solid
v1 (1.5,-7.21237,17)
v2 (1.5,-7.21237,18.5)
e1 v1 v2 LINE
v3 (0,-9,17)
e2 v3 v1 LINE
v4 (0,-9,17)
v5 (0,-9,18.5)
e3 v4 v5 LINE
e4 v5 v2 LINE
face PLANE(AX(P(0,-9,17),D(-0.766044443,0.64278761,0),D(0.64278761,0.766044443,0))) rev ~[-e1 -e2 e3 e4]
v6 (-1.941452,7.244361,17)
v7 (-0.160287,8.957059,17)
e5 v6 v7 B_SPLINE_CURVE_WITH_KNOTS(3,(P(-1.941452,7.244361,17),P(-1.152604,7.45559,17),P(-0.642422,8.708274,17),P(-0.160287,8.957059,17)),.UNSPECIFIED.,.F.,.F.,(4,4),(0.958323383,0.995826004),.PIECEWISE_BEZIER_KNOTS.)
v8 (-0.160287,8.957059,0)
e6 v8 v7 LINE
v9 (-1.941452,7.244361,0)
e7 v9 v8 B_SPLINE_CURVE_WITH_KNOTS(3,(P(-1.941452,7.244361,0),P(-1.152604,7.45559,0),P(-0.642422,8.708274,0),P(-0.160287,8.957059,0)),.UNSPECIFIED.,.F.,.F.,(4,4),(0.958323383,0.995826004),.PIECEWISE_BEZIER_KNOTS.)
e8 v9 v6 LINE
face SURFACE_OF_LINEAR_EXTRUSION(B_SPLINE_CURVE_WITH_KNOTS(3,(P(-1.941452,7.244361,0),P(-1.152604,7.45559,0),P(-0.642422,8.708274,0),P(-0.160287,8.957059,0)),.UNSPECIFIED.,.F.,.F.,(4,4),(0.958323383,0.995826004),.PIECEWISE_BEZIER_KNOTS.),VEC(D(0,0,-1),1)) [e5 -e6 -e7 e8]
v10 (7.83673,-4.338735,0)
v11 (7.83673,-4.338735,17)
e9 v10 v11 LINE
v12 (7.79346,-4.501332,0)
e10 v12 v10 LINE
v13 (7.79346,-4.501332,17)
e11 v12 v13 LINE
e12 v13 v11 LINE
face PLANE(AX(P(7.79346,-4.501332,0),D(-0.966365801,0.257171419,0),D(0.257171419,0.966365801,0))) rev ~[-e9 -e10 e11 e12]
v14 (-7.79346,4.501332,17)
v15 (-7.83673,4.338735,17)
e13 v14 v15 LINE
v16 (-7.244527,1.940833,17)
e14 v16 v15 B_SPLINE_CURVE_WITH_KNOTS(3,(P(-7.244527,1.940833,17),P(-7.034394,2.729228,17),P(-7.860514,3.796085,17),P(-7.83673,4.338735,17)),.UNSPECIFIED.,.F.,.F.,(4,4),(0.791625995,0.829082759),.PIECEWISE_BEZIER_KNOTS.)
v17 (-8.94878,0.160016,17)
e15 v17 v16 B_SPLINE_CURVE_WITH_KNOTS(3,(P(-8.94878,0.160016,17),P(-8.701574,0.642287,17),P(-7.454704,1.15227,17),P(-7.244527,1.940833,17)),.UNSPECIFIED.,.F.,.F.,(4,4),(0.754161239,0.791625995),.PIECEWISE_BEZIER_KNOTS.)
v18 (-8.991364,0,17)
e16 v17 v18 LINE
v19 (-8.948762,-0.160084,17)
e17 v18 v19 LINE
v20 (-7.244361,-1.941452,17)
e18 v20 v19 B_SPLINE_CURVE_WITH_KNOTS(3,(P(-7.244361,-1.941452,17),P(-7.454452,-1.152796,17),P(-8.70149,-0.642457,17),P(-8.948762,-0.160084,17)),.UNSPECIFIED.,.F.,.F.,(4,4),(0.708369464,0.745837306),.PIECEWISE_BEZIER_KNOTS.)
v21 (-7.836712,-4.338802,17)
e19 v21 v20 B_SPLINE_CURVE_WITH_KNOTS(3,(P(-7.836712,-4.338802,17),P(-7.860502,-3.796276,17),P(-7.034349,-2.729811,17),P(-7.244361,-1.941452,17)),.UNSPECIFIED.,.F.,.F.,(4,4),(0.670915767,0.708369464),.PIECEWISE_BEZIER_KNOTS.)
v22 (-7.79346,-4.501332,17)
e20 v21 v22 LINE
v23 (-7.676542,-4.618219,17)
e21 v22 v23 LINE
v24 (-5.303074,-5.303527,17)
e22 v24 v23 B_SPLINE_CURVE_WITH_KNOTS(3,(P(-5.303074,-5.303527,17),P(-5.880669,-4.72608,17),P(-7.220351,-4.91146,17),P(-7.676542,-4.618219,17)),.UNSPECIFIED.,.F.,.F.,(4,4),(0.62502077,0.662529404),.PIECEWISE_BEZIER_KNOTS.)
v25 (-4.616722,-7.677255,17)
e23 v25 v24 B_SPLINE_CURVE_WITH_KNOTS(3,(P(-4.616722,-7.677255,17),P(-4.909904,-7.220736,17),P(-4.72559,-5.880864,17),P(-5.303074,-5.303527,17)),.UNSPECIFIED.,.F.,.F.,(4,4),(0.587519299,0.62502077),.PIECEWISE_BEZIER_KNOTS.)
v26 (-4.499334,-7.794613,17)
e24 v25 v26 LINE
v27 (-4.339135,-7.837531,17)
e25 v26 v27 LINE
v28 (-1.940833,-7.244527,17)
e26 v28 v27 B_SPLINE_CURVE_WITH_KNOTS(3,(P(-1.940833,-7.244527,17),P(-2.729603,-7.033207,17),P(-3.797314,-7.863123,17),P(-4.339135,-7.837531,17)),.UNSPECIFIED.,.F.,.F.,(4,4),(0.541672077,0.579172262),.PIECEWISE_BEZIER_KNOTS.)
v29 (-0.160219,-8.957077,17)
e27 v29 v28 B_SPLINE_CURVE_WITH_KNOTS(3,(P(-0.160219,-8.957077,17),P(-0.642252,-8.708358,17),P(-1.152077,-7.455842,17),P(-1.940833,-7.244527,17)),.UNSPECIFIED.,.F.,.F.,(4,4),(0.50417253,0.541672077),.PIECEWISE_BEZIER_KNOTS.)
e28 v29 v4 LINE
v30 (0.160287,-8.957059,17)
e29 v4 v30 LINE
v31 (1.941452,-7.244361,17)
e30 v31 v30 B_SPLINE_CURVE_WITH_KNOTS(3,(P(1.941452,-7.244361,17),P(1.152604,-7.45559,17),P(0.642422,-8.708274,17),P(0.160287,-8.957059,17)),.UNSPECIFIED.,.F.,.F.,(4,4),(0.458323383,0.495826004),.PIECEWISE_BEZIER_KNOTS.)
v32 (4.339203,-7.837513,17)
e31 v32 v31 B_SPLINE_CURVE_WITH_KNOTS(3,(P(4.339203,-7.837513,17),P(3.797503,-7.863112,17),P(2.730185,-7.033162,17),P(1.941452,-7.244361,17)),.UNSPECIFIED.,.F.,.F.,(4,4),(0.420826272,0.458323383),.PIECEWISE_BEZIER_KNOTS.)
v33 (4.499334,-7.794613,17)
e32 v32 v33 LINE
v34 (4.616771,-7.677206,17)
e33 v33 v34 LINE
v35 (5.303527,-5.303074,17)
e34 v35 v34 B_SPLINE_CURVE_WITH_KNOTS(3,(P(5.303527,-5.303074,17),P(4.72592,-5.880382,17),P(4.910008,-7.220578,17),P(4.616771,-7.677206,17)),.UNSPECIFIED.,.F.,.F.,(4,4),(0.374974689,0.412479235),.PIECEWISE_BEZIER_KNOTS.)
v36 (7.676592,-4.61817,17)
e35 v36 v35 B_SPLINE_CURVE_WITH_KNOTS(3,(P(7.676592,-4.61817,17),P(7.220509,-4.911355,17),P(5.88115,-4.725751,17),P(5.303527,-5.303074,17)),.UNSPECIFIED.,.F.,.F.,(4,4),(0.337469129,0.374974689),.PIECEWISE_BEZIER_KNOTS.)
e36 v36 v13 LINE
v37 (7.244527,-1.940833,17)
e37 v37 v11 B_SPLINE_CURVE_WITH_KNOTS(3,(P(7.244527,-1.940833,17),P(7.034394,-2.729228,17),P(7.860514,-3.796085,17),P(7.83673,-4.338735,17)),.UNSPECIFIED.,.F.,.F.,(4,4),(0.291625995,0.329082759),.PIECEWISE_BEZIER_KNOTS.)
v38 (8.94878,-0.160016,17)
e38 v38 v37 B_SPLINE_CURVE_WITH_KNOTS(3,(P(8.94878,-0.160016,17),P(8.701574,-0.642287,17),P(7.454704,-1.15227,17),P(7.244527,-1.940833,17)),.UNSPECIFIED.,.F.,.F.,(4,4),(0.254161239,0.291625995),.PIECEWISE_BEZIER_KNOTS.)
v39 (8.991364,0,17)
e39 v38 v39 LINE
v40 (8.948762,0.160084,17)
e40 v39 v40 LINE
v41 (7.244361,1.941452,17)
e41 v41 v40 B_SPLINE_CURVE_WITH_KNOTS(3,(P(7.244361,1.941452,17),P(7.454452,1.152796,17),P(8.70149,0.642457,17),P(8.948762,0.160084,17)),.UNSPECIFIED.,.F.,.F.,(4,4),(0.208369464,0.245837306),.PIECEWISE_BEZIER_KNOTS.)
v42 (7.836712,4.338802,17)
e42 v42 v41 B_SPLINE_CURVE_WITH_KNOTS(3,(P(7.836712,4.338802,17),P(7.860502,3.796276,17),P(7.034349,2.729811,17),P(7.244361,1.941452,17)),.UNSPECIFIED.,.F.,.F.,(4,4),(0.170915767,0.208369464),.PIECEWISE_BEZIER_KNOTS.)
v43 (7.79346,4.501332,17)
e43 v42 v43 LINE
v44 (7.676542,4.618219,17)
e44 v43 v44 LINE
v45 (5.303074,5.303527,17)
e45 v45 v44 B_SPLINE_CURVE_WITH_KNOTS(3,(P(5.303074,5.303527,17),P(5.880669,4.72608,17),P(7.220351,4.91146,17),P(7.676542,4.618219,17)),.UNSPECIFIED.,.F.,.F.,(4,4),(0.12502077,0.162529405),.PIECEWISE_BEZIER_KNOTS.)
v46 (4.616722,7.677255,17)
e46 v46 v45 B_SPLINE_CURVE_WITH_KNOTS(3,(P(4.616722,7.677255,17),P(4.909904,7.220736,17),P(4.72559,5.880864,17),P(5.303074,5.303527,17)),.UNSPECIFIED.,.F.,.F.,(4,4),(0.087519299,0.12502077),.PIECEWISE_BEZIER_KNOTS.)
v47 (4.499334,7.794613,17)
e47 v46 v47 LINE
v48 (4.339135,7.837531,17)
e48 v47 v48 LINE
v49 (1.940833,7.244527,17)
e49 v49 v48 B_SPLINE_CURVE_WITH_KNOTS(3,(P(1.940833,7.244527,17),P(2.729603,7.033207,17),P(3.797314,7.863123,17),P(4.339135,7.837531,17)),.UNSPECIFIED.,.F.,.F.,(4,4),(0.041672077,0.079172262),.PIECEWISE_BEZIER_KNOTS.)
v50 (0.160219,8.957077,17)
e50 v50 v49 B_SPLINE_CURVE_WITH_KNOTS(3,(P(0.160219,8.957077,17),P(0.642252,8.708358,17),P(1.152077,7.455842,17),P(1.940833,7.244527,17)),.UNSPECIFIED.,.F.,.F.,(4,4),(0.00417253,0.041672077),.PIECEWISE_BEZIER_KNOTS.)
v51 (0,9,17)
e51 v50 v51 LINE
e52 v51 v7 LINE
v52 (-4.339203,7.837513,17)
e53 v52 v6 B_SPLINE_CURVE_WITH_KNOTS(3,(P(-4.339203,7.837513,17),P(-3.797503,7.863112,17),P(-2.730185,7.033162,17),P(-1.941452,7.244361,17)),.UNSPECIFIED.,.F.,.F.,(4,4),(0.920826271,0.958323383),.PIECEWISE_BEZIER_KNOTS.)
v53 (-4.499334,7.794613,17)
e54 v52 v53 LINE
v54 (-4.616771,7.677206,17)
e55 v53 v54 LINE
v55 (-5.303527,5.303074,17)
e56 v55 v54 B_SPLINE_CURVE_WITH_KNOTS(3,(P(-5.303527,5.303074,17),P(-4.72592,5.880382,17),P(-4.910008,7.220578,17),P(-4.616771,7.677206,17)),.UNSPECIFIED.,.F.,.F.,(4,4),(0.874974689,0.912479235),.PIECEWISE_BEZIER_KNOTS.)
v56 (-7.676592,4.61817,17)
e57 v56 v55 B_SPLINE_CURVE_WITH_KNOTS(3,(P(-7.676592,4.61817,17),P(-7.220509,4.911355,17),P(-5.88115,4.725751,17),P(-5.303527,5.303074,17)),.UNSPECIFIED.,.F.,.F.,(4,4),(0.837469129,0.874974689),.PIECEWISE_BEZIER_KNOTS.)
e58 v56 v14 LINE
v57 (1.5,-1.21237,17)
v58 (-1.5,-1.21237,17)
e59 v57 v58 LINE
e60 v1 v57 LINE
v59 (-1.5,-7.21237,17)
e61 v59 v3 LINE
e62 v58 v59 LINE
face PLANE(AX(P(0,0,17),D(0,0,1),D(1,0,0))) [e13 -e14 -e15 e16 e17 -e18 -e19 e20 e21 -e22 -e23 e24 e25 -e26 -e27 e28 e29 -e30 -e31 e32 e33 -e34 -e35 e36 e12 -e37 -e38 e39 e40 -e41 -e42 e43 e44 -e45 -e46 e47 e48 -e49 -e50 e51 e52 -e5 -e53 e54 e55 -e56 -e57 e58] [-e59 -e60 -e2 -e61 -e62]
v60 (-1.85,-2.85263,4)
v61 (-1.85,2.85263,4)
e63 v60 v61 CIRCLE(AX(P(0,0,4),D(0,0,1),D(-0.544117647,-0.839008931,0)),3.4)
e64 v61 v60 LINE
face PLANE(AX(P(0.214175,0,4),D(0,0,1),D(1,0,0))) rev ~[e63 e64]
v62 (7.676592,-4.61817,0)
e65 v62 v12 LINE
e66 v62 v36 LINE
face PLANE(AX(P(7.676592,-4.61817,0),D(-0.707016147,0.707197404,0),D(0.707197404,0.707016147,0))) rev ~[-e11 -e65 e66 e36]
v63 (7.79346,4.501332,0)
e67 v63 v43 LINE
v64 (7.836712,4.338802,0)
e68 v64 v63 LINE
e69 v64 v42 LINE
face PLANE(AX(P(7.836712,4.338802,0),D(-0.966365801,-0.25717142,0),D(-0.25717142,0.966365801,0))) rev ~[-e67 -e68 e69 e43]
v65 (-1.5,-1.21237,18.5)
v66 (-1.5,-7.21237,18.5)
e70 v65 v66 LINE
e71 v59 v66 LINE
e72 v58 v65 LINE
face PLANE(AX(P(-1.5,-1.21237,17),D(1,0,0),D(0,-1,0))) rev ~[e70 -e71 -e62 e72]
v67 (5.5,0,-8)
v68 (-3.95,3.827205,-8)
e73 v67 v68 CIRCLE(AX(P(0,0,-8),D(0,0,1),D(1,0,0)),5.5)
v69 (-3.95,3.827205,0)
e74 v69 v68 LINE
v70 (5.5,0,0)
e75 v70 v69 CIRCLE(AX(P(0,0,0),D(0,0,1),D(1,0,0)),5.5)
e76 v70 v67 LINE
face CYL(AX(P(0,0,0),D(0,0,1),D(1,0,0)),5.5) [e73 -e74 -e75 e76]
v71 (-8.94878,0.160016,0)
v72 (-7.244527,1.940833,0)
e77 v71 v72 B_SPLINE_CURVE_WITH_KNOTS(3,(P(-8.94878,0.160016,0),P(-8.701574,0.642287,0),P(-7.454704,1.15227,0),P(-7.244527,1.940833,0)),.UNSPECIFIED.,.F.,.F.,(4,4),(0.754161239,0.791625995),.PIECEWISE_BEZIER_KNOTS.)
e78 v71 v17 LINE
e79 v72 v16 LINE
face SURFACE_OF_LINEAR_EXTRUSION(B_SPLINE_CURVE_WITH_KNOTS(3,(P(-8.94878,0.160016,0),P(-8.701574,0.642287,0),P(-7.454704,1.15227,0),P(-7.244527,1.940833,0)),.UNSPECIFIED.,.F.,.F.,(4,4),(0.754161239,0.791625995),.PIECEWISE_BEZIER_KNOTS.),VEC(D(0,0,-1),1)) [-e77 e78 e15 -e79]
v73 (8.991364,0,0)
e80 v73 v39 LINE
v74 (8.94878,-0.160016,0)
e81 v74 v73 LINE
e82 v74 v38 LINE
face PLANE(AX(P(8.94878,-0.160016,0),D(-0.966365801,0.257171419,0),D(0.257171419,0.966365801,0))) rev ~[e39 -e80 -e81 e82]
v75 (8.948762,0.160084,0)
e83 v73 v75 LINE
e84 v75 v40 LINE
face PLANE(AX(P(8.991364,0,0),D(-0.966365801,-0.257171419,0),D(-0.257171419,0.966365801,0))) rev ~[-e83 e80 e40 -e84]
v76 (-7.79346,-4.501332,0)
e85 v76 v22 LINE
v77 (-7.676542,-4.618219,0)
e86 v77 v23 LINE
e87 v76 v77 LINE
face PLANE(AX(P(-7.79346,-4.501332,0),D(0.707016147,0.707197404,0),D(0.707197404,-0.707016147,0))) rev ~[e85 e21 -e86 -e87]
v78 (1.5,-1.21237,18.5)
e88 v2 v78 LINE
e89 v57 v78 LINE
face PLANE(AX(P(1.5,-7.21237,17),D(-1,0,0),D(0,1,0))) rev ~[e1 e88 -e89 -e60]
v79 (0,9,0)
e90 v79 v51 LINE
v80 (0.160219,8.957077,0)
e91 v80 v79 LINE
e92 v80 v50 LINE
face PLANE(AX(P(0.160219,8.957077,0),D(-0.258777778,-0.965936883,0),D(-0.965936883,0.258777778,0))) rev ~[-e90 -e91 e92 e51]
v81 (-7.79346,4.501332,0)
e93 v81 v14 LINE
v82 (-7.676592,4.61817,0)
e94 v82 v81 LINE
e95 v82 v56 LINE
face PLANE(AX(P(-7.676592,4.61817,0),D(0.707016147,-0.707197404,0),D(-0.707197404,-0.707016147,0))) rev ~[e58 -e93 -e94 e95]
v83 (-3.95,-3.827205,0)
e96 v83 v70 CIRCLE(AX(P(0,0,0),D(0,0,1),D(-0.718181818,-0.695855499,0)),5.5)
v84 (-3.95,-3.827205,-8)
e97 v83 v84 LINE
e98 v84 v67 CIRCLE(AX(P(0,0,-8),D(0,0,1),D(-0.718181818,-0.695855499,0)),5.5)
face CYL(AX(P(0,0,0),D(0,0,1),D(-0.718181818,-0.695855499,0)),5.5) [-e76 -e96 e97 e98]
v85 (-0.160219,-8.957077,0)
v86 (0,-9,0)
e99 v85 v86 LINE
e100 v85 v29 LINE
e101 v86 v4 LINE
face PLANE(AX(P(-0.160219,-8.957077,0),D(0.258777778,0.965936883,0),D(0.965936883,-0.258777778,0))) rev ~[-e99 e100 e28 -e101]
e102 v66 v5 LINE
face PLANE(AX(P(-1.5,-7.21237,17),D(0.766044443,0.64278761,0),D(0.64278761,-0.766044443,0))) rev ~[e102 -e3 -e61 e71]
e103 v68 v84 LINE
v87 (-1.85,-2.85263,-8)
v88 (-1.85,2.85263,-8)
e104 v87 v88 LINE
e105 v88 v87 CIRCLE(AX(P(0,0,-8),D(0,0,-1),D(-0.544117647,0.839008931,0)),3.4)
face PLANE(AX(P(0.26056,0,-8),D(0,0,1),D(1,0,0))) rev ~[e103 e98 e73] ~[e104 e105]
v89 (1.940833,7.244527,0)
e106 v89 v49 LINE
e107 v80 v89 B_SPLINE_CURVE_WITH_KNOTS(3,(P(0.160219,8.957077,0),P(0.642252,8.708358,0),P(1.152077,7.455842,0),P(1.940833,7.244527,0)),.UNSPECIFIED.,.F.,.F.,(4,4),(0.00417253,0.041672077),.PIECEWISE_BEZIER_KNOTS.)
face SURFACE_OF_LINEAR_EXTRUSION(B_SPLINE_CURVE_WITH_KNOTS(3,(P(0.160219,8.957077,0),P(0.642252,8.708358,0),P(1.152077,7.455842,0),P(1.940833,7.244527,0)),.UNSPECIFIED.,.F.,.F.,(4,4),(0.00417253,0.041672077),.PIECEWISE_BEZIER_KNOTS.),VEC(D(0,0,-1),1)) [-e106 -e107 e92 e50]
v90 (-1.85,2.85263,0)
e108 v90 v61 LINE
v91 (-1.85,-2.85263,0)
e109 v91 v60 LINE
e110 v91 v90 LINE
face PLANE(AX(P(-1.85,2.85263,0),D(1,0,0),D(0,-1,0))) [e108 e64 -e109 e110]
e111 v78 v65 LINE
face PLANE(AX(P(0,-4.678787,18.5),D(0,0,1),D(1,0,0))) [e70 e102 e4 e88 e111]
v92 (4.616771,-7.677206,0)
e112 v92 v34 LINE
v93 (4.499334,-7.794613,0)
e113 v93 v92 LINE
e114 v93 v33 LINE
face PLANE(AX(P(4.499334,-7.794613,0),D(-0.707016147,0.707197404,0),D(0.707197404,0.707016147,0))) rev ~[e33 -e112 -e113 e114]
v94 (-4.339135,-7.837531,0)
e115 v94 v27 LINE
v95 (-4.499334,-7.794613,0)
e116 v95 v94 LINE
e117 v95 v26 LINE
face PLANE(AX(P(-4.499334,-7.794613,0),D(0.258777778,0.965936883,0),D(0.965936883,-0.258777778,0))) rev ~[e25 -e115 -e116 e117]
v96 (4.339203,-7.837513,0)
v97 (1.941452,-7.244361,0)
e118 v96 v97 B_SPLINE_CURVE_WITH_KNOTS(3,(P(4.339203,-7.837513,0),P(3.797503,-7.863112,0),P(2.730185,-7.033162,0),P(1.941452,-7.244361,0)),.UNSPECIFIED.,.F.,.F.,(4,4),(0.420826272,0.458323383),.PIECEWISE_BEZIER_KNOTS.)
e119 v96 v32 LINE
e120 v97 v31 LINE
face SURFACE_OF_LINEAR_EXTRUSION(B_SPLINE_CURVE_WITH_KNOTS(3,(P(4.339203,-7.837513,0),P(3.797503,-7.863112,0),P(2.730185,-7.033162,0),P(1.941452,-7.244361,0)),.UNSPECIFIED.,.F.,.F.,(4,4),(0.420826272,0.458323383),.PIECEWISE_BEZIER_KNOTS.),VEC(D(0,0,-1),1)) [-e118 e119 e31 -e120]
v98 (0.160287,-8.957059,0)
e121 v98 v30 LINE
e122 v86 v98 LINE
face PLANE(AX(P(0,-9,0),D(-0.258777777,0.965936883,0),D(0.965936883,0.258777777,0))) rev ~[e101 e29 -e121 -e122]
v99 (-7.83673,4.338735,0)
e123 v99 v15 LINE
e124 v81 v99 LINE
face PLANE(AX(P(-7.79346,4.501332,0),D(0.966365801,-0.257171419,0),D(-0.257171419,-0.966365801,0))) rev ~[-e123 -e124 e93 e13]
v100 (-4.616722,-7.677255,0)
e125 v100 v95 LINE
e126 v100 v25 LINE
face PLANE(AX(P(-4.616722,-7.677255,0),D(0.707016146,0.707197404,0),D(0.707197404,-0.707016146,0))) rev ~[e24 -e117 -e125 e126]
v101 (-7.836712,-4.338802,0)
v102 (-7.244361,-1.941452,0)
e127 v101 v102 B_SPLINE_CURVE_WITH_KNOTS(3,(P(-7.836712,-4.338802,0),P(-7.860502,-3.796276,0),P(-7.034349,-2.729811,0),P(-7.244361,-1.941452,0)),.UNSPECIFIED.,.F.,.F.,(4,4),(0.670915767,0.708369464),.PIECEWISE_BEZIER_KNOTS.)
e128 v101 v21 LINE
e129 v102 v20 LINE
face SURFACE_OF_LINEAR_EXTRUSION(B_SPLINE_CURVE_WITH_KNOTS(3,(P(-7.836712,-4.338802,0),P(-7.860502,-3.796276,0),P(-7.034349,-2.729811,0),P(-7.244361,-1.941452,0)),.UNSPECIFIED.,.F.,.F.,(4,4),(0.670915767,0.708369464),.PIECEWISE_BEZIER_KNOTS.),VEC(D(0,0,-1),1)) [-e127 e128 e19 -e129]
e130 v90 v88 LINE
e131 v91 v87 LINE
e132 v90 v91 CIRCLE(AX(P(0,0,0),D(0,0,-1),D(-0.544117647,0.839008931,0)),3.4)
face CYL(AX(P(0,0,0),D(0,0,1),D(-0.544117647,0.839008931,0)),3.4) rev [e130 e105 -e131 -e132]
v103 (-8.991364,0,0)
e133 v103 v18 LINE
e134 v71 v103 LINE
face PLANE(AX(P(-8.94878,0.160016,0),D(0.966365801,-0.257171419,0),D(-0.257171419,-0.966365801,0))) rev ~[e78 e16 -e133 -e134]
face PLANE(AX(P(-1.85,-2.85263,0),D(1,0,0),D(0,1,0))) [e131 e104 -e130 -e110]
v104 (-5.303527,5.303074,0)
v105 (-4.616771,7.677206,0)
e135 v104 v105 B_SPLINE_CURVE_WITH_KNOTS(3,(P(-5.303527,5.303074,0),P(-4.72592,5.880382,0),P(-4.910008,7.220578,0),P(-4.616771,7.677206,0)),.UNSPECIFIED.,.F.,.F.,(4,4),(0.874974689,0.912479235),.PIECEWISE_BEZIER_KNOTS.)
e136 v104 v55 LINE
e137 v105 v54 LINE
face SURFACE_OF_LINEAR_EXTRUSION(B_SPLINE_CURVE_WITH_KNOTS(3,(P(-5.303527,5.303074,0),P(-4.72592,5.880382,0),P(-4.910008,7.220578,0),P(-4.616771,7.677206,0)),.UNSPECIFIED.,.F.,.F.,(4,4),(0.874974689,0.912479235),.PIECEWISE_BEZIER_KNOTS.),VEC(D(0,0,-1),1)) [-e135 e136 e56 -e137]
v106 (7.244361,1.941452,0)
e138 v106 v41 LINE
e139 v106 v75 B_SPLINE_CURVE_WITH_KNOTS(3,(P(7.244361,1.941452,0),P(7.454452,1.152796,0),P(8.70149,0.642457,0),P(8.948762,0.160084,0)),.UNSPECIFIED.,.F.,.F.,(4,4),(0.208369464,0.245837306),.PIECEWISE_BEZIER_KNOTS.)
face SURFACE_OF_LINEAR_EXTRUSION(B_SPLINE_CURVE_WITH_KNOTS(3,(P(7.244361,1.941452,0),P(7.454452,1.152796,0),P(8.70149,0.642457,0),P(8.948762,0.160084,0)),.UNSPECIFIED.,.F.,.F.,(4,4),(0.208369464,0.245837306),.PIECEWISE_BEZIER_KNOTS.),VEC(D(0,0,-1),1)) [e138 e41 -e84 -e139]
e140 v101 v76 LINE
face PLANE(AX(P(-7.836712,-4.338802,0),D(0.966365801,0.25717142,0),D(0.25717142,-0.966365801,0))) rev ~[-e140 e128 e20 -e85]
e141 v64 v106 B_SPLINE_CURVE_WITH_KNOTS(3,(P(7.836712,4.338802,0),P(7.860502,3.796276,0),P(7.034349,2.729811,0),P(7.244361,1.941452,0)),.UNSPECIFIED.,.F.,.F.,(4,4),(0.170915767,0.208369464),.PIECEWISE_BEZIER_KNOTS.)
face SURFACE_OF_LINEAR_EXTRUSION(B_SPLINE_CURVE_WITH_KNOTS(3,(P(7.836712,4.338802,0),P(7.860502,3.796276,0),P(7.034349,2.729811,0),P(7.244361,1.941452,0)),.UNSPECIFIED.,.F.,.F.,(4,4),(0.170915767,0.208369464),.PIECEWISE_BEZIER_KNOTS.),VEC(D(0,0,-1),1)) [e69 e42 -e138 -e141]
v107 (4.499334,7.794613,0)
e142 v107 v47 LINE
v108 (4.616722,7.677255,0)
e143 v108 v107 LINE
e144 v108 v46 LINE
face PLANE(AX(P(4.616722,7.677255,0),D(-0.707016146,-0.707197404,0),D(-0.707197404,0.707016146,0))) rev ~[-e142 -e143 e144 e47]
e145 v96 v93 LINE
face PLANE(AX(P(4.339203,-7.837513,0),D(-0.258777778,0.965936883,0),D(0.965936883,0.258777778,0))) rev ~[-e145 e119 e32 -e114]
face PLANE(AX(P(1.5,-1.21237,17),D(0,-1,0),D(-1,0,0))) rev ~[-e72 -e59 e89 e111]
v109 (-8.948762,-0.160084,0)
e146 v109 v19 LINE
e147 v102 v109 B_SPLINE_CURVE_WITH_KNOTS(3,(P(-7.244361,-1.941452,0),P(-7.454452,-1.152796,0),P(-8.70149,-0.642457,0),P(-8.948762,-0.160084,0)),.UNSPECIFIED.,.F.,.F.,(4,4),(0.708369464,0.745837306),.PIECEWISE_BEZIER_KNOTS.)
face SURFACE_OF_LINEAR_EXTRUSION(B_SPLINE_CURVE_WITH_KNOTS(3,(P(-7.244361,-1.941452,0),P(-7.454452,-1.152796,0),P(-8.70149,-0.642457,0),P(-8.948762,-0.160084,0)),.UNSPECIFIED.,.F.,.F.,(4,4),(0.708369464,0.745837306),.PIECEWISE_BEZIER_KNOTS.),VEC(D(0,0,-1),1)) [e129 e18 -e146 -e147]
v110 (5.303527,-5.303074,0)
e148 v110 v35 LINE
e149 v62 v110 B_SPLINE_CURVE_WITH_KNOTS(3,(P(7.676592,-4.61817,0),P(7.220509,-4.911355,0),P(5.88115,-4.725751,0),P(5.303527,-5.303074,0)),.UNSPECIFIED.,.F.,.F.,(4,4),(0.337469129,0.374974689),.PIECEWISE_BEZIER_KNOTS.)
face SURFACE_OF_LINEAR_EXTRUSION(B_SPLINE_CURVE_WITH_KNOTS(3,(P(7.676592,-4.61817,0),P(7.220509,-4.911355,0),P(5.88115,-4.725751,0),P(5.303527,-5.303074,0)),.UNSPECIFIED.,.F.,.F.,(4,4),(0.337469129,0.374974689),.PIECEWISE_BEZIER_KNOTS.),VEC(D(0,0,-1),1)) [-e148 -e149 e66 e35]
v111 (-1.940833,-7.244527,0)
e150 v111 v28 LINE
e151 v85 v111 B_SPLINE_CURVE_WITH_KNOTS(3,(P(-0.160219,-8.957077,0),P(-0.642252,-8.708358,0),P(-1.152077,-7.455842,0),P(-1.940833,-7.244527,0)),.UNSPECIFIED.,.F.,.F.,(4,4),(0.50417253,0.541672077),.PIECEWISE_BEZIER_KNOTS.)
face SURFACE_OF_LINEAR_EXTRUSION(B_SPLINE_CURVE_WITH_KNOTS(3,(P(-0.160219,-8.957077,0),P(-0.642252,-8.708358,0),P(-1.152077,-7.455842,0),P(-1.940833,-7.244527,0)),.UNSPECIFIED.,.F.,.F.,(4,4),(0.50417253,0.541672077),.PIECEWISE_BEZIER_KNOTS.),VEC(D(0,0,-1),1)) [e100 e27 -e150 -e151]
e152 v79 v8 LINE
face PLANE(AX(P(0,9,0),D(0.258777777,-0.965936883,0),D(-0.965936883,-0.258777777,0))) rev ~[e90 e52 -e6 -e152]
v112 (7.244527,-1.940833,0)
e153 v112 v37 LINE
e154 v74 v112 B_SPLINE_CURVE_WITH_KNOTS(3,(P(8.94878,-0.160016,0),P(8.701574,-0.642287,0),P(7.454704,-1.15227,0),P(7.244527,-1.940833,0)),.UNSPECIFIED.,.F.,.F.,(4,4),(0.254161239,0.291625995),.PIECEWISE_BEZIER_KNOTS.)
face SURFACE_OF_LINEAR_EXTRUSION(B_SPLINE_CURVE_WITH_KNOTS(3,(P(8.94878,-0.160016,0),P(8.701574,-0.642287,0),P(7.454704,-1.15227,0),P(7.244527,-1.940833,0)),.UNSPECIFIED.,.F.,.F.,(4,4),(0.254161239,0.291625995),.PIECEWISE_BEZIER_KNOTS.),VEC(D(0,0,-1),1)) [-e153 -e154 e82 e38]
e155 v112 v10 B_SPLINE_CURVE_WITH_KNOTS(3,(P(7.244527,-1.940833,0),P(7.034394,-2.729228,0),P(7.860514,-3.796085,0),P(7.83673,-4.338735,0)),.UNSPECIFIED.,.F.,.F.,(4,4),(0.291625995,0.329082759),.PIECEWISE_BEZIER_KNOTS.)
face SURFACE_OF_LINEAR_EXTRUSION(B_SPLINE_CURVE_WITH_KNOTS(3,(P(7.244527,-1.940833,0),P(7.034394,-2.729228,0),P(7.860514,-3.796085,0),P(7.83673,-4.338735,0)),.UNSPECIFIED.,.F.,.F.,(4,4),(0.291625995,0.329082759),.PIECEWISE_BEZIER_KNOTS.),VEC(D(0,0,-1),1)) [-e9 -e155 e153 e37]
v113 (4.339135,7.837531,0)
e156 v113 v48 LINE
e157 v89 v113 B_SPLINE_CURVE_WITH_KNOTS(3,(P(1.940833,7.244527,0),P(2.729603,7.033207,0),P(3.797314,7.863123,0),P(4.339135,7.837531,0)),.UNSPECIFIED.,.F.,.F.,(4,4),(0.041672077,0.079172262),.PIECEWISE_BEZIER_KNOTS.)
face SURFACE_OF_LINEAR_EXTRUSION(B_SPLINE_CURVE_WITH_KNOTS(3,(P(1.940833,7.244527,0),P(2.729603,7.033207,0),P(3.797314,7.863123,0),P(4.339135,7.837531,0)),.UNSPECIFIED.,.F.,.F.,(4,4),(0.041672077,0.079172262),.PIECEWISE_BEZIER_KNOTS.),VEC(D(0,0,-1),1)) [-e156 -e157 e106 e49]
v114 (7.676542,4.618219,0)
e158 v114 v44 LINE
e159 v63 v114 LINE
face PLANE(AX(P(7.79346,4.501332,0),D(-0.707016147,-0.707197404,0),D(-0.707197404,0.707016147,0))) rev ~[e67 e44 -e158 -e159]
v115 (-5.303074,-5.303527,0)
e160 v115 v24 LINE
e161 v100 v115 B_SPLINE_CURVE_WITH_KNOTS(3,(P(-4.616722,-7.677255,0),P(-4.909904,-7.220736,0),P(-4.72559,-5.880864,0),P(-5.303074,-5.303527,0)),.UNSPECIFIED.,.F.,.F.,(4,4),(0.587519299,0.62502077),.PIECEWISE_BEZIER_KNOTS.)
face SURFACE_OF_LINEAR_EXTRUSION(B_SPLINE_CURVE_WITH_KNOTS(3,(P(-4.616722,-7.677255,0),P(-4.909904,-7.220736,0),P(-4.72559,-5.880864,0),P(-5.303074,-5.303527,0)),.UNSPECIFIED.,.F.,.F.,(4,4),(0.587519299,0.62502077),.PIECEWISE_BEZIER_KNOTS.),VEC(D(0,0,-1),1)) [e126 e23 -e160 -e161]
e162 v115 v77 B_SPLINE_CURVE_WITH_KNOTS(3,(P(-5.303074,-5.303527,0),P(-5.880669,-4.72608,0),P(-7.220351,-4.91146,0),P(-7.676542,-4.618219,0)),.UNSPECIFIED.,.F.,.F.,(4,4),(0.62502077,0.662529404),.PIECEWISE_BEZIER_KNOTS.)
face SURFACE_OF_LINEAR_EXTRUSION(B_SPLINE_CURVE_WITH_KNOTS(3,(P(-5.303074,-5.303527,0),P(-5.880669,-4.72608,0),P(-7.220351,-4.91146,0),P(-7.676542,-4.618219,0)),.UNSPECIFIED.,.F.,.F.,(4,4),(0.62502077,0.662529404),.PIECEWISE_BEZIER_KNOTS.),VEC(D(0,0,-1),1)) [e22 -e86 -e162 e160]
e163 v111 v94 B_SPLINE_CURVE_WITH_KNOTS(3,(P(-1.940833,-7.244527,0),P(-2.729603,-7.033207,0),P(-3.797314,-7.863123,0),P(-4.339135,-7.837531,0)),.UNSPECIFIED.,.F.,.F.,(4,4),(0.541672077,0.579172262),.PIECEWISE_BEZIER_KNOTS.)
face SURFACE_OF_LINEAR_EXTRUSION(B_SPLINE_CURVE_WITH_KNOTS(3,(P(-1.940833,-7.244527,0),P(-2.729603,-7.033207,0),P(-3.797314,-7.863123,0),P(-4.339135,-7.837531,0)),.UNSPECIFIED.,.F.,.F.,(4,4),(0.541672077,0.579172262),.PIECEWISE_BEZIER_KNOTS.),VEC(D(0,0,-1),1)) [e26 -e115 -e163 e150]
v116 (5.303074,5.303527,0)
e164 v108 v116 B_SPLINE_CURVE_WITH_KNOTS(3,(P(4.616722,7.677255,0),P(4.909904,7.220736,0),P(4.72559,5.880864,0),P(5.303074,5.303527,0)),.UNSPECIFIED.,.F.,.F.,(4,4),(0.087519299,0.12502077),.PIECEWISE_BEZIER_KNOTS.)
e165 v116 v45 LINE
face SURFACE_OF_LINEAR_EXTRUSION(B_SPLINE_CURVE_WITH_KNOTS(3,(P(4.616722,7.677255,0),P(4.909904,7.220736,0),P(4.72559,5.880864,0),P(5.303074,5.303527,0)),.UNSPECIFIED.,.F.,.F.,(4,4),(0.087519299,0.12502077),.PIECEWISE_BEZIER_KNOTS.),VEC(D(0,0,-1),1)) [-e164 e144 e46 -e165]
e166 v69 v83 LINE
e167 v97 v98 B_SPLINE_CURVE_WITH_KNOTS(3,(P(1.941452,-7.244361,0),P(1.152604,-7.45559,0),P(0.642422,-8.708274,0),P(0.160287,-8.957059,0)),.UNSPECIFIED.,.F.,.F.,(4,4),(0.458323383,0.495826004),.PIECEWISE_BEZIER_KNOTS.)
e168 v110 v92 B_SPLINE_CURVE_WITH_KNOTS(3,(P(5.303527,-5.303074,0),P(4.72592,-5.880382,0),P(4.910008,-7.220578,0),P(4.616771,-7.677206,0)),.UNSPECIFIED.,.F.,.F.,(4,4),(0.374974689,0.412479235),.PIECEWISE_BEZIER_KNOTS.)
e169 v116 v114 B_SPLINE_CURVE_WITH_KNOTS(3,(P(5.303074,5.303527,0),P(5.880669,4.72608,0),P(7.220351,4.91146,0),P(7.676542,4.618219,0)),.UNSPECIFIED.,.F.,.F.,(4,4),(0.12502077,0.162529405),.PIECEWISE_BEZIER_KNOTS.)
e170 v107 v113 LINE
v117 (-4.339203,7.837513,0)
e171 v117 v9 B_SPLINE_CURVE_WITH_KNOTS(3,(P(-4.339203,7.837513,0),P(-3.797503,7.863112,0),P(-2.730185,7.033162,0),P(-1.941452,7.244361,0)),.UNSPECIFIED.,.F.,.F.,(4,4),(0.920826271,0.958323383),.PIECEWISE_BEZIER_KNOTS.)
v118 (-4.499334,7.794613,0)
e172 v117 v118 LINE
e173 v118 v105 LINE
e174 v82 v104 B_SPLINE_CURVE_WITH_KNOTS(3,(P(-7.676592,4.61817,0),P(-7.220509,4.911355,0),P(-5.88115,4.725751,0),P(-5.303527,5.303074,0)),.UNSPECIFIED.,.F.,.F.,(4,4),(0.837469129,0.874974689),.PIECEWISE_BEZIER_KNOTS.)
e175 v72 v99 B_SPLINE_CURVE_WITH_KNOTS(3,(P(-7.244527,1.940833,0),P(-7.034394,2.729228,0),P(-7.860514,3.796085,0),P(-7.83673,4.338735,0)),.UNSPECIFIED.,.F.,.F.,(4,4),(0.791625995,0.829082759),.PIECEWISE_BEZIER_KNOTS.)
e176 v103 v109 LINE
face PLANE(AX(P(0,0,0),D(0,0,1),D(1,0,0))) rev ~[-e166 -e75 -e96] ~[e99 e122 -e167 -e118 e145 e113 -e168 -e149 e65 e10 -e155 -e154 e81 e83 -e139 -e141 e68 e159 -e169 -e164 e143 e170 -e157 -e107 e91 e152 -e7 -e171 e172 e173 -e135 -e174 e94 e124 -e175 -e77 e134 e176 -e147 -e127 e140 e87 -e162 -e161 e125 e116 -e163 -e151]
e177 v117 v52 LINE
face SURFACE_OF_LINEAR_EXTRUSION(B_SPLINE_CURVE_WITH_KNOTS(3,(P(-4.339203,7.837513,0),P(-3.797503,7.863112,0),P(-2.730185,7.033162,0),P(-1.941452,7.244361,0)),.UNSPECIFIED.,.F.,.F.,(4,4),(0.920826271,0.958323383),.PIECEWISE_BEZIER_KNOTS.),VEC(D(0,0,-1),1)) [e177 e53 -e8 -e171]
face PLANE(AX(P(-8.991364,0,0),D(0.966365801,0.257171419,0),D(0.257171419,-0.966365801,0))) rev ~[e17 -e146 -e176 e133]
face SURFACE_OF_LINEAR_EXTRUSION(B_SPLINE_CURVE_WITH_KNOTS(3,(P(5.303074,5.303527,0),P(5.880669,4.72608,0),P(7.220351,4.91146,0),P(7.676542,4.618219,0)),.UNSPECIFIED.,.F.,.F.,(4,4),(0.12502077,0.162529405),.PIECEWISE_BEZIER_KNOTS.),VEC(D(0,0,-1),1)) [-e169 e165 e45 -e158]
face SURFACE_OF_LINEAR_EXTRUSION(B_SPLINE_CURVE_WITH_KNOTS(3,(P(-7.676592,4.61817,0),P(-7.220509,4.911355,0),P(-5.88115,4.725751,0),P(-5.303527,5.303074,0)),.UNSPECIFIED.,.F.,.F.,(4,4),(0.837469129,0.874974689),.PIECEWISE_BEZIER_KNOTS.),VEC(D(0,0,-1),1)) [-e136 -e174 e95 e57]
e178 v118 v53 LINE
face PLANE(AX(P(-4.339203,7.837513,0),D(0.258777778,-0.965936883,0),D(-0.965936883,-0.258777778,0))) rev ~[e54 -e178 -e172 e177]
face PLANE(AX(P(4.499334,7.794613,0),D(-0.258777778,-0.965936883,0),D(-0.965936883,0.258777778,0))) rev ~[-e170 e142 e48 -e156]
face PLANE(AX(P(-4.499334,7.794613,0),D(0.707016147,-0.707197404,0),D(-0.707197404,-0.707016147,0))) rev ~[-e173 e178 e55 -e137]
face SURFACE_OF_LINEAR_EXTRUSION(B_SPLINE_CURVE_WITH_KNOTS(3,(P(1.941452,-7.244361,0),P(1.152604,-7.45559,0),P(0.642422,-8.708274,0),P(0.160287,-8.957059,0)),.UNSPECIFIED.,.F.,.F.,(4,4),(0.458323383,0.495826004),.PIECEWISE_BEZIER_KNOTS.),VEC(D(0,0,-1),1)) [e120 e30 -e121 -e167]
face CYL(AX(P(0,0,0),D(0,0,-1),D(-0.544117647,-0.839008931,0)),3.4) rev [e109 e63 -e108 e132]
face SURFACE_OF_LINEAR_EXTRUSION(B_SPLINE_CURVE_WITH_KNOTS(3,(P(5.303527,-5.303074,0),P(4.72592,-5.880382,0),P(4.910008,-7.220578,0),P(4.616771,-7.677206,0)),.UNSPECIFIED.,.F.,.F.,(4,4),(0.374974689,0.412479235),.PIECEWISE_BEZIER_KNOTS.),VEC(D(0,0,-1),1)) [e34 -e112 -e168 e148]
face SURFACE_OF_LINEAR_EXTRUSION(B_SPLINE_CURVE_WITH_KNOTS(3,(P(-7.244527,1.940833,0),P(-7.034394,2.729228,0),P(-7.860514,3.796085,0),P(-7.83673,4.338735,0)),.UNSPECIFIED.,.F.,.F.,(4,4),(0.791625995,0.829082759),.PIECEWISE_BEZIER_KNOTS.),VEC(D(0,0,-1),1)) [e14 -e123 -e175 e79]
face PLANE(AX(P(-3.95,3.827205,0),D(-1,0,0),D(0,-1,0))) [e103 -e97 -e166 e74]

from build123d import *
from build123d import SkipClean  # not in build123d's __all__

# Parameters (mm, degrees)
F1_DEPTH = 17
F2_DEPTH = 8
F3_DEPTH = 4
F5_DEPTH = 1.5


# Not quite as in the source:
# - after a boolean that leaves OpenCascade's solid faulty, fix() repairs it
# - a feature names something its author has since deleted; it is built from what else it names


with BuildPart() as f1:
    # F0 (on Top) → F1 (new body)
    with BuildSketch(Plane.XY):
        Polygon((-7.2445266217, 1.9408333333), (-7.2443607594, -1.9414523397), (-5.303074282, -5.3035274261), (-1.9408333333, -7.2445266217), (1.9414523397, -7.2443607594), (5.3035274261, -5.303074282), (7.2445266217, -1.9408333333), (7.2443607594, 1.9414523397), (5.303074282, 5.3035274261), (1.9408333333, 7.2445266217), (-1.9414523397, 7.2443607594), (-5.3035274261, 5.303074282), align=None)
        with BuildLine():
            ThreePointArc((-3.95, 3.8272052467), (2.0645822822, 5.0977936404), (5.5, 0))
            ThreePointArc((5.5, 0), (2.0645822822, -5.0977936404), (-3.95, -3.8272052467))
            ThreePointArc((-3.95, -3.8272052467), (-5.5, 0), (-3.95, 3.8272052467))
        make_face(mode=Mode.SUBTRACT)
        with BuildLine():
            ThreePointArc((-3.95, -3.8272052467), (2.0645822822, -5.0977936404), (5.5, 0))
            ThreePointArc((5.5, 0), (2.0645822822, 5.0977936404), (-3.95, 3.8272052467))
            Line((-3.95, 3.8272052467), (-3.95, -3.8272052467))
        make_face()
        with BuildLine():
            Line((-1.85, -2.8526303651), (-1.85, 2.8526303651))
            ThreePointArc((-1.85, 2.8526303651), (3.4, 0), (-1.85, -2.8526303651))
        make_face(mode=Mode.SUBTRACT)
        with BuildLine():
            ThreePointArc((-1.85, -2.8526303651), (3.4, 0), (-1.85, 2.8526303651))
            Line((-1.85, 2.8526303651), (-1.85, -2.8526303651))
        make_face()
        with BuildLine():
            Line((-3.95, -3.8272052467), (-3.95, 3.8272052467))
            ThreePointArc((-3.95, 3.8272052467), (-5.5, 0), (-3.95, -3.8272052467))
        make_face()
        with BuildLine():
            add(Edge.make_bspline(
                [(5.303074282, 5.3035274261), (5.8806686185, 4.7260804431), (7.2203514603, 4.9114598493), (7.6765424159, 4.6182190274)],
                knots=[0.1250207704, 0.1250207704, 0.1250207704, 0.1250207704, 0.1625294045, 0.1625294045, 0.1625294045, 0.1625294045], degree=3))
            Line((5.303074282, 5.3035274261), (7.2443607594, 1.9414523397))
            add(Edge.make_bspline(
                [(7.836712211, 4.338802441), (7.8605022236, 3.7962755696), (7.0343491304, 2.7298107055), (7.2443607594, 1.9414523397)],
                knots=[0.1709157668, 0.1709157668, 0.1709157668, 0.1709157668, 0.2083694642, 0.2083694642, 0.2083694642, 0.2083694642], degree=3))
            Line((7.836712211, 4.338802441), (7.7934595092, 4.5013319004))
            Line((7.7934595092, 4.5013319004), (7.6765424159, 4.6182190274))
        make_face()
        with BuildLine():
            Line((7.2445266217, -1.9408333333), (5.3035274261, -5.303074282))
            add(Edge.make_bspline(
                [(7.6765915068, -4.6181699492), (7.2205093081, -4.9113554899), (5.8811502119, -4.725750538), (5.3035274261, -5.303074282)],
                knots=[0.3374691289, 0.3374691289, 0.3374691289, 0.3374691289, 0.3749746888, 0.3749746888, 0.3749746888, 0.3749746888], degree=3))
            Line((7.6765915068, -4.6181699492), (7.7934595092, -4.5013319004))
            Line((7.7934595092, -4.5013319004), (7.8367302299, -4.3387347317))
            add(Edge.make_bspline(
                [(7.2445266217, -1.9408333333), (7.0343944918, -2.729228444), (7.8605138313, -3.7960853183), (7.8367302299, -4.3387347317)],
                knots=[0.2916259951, 0.2916259951, 0.2916259951, 0.2916259951, 0.3290827591, 0.3290827591, 0.3290827591, 0.3290827591], degree=3))
        make_face()
        with BuildLine():
            Line((-7.836712211, -4.338802441), (-7.7934595092, -4.5013319004))
            Line((-7.7934595092, -4.5013319004), (-7.6765424159, -4.6182190274))
            add(Edge.make_bspline(
                [(-5.303074282, -5.3035274261), (-5.8806686185, -4.7260804431), (-7.2203514603, -4.9114598493), (-7.6765424159, -4.6182190274)],
                knots=[0.6250207704, 0.6250207704, 0.6250207704, 0.6250207704, 0.6625294045, 0.6625294045, 0.6625294045, 0.6625294045], degree=3))
            Line((-5.303074282, -5.3035274261), (-7.2443607594, -1.9414523397))
            add(Edge.make_bspline(
                [(-7.836712211, -4.338802441), (-7.8605022236, -3.7962755696), (-7.0343491304, -2.7298107055), (-7.2443607594, -1.9414523397)],
                knots=[0.6709157668, 0.6709157668, 0.6709157668, 0.6709157668, 0.7083694642, 0.7083694642, 0.7083694642, 0.7083694642], degree=3))
        make_face()
        with BuildLine():
            add(Edge.make_bspline(
                [(-7.2445266217, 1.9408333333), (-7.0343944918, 2.729228444), (-7.8605138313, 3.7960853183), (-7.8367302299, 4.3387347317)],
                knots=[0.7916259951, 0.7916259951, 0.7916259951, 0.7916259951, 0.8290827591, 0.8290827591, 0.8290827591, 0.8290827591], degree=3))
            Line((-7.2445266217, 1.9408333333), (-5.3035274261, 5.303074282))
            add(Edge.make_bspline(
                [(-7.6765915068, 4.6181699492), (-7.2205093081, 4.9113554899), (-5.8811502119, 4.725750538), (-5.3035274261, 5.303074282)],
                knots=[0.8374691289, 0.8374691289, 0.8374691289, 0.8374691289, 0.8749746888, 0.8749746888, 0.8749746888, 0.8749746888], degree=3))
            Line((-7.6765915068, 4.6181699492), (-7.7934595092, 4.5013319004))
            Line((-7.7934595092, 4.5013319004), (-7.8367302299, 4.3387347317))
        make_face()
        with BuildLine():
            add(Edge.make_bspline(
                [(-5.3035274261, 5.303074282), (-4.7259202525, 5.8803824219), (-4.9100082127, 7.220578017), (-4.616771189, 7.6772060222)],
                knots=[0.8749746888, 0.8749746888, 0.8749746888, 0.8749746888, 0.912479235, 0.912479235, 0.912479235, 0.912479235], degree=3))
            Line((-5.3035274261, 5.303074282), (-1.9414523397, 7.2443607594))
            add(Edge.make_bspline(
                [(-4.3392026037, 7.8375128572), (-3.7975030713, 7.8631116303), (-2.7301851448, 7.0331622426), (-1.9414523397, 7.2443607594)],
                knots=[0.9208262715, 0.9208262715, 0.9208262715, 0.9208262715, 0.9583233826, 0.9583233826, 0.9583233826, 0.9583233826], degree=3))
            Line((-4.3392026037, 7.8375128572), (-4.4993340005, 7.7946131111))
            Line((-4.4993340005, 7.7946131111), (-4.616771189, 7.6772060222))
        make_face()
        with BuildLine():
            add(Edge.make_bspline(
                [(1.9408333333, 7.2445266217), (2.7296030644, 7.0332071753), (3.7973140152, 7.8631231549), (4.3391354979, 7.8375308351)],
                knots=[0.0416720765, 0.0416720765, 0.0416720765, 0.0416720765, 0.0791722617, 0.0791722617, 0.0791722617, 0.0791722617], degree=3))
            Line((1.9408333333, 7.2445266217), (5.303074282, 5.3035274261))
            add(Edge.make_bspline(
                [(4.6167220822, 7.6772551165), (4.9099036808, 7.2207359364), (4.7255902419, 5.8808641408), (5.303074282, 5.3035274261)],
                knots=[0.087519299, 0.087519299, 0.087519299, 0.087519299, 0.1250207704, 0.1250207704, 0.1250207704, 0.1250207704], degree=3))
            Line((4.6167220822, 7.6772551165), (4.4993340005, 7.7946131111))
            Line((4.4993340005, 7.7946131111), (4.3391354979, 7.8375308351))
        make_face()
        with BuildLine():
            Line((5.3035274261, -5.303074282), (1.9414523397, -7.2443607594))
            add(Edge.make_bspline(
                [(4.3392026037, -7.8375128572), (3.7975030713, -7.8631116303), (2.7301851448, -7.0331622426), (1.9414523397, -7.2443607594)],
                knots=[0.4208262715, 0.4208262715, 0.4208262715, 0.4208262715, 0.4583233826, 0.4583233826, 0.4583233826, 0.4583233826], degree=3))
            Line((4.3392026037, -7.8375128572), (4.4993340005, -7.7946131111))
            Line((4.4993340005, -7.7946131111), (4.616771189, -7.6772060222))
            add(Edge.make_bspline(
                [(5.3035274261, -5.303074282), (4.7259202525, -5.8803824219), (4.9100082127, -7.220578017), (4.616771189, -7.6772060222)],
                knots=[0.3749746888, 0.3749746888, 0.3749746888, 0.3749746888, 0.412479235, 0.412479235, 0.412479235, 0.412479235], degree=3))
        make_face()
        with BuildLine():
            add(Edge.make_bspline(
                [(-4.6167220822, -7.6772551165), (-4.9099036808, -7.2207359364), (-4.7255902419, -5.8808641408), (-5.303074282, -5.3035274261)],
                knots=[0.587519299, 0.587519299, 0.587519299, 0.587519299, 0.6250207704, 0.6250207704, 0.6250207704, 0.6250207704], degree=3))
            Line((-4.6167220822, -7.6772551165), (-4.4993340005, -7.7946131111))
            Line((-4.4993340005, -7.7946131111), (-4.3391354979, -7.8375308351))
            add(Edge.make_bspline(
                [(-1.9408333333, -7.2445266217), (-2.7296030644, -7.0332071753), (-3.7973140152, -7.8631231549), (-4.3391354979, -7.8375308351)],
                knots=[0.5416720765, 0.5416720765, 0.5416720765, 0.5416720765, 0.5791722617, 0.5791722617, 0.5791722617, 0.5791722617], degree=3))
            Line((-1.9408333333, -7.2445266217), (-5.303074282, -5.3035274261))
        make_face()
        with BuildLine():
            add(Edge.make_bspline(
                [(-1.9414523397, 7.2443607594), (-1.1526036351, 7.4555903106), (-0.6424219306, 8.7082737692), (-0.1602865257, 8.9570586944)],
                knots=[0.9583233826, 0.9583233826, 0.9583233826, 0.9583233826, 0.9958260038, 0.9958260038, 0.9958260038, 0.9958260038], degree=3))
            Line((-1.9414523397, 7.2443607594), (1.9408333333, 7.2445266217))
            add(Edge.make_bspline(
                [(0.1602194418, 8.9570766663), (0.6422524515, 8.7083582889), (1.1520770317, 7.4558424701), (1.9408333333, 7.2445266217)],
                knots=[0.0041725298, 0.0041725298, 0.0041725298, 0.0041725298, 0.0416720765, 0.0416720765, 0.0416720765, 0.0416720765], degree=3))
            Line((0.1602194418, 8.9570766663), (0, 9))
            Line((0, 9), (-0.1602865257, 8.9570586944))
        make_face()
        with BuildLine():
            Line((1.9414523397, -7.2443607594), (-1.9408333333, -7.2445266217))
            add(Edge.make_bspline(
                [(-0.1602194418, -8.9570766663), (-0.6422524515, -8.7083582889), (-1.1520770317, -7.4558424701), (-1.9408333333, -7.2445266217)],
                knots=[0.5041725298, 0.5041725298, 0.5041725298, 0.5041725298, 0.5416720765, 0.5416720765, 0.5416720765, 0.5416720765], degree=3))
            Line((-0.1602194418, -8.9570766663), (0, -9))
            Line((0, -9), (0.1602865257, -8.9570586944))
            add(Edge.make_bspline(
                [(1.9414523397, -7.2443607594), (1.1526036351, -7.4555903106), (0.6424219306, -8.7082737692), (0.1602865257, -8.9570586944)],
                knots=[0.4583233826, 0.4583233826, 0.4583233826, 0.4583233826, 0.4958260038, 0.4958260038, 0.4958260038, 0.4958260038], degree=3))
        make_face()
        with BuildLine():
            Line((7.2443607594, 1.9414523397), (7.2445266217, -1.9408333333))
            add(Edge.make_bspline(
                [(8.9487800371, -0.160016485), (8.7015742639, -0.6422872861), (7.4547035861, -1.1522700079), (7.2445266217, -1.9408333333)],
                knots=[0.2541612392, 0.2541612392, 0.2541612392, 0.2541612392, 0.2916259951, 0.2916259951, 0.2916259951, 0.2916259951], degree=3))
            Line((8.9487800371, -0.160016485), (8.9913639805, 0))
            Line((8.9913639805, 0), (8.948762183, 0.1600835748))
            add(Edge.make_bspline(
                [(7.2443607594, 1.9414523397), (7.4544516979, 1.1527962558), (8.701490107, 0.6424567599), (8.948762183, 0.1600835748)],
                knots=[0.2083694642, 0.2083694642, 0.2083694642, 0.2083694642, 0.2458373058, 0.2458373058, 0.2458373058, 0.2458373058], degree=3))
        make_face()
        with BuildLine():
            Line((-8.9913639805, 0), (-8.948762183, -0.1600835748))
            add(Edge.make_bspline(
                [(-7.2443607594, -1.9414523397), (-7.4544516979, -1.1527962558), (-8.701490107, -0.6424567599), (-8.948762183, -0.1600835748)],
                knots=[0.7083694642, 0.7083694642, 0.7083694642, 0.7083694642, 0.7458373058, 0.7458373058, 0.7458373058, 0.7458373058], degree=3))
            Line((-7.2443607594, -1.9414523397), (-7.2445266217, 1.9408333333))
            add(Edge.make_bspline(
                [(-8.9487800371, 0.160016485), (-8.7015742639, 0.6422872861), (-7.4547035861, 1.1522700079), (-7.2445266217, 1.9408333333)],
                knots=[0.7541612392, 0.7541612392, 0.7541612392, 0.7541612392, 0.7916259951, 0.7916259951, 0.7916259951, 0.7916259951], degree=3))
            Line((-8.9487800371, 0.160016485), (-8.9913639805, 0))
        make_face()
    extrude(amount=F1_DEPTH)

    # F0 (on Top) → F2 (join)
    with BuildSketch(Plane.XY):
        with BuildLine():
            ThreePointArc((-3.95, -3.8272052467), (2.0645822822, -5.0977936404), (5.5, 0))
            ThreePointArc((5.5, 0), (2.0645822822, 5.0977936404), (-3.95, 3.8272052467))
            Line((-3.95, 3.8272052467), (-3.95, -3.8272052467))
        make_face()
        with BuildLine():
            Line((-1.85, -2.8526303651), (-1.85, 2.8526303651))
            ThreePointArc((-1.85, 2.8526303651), (3.4, 0), (-1.85, -2.8526303651))
        make_face(mode=Mode.SUBTRACT)
    extrude(amount=-F2_DEPTH)

    # F0 (on Top) → F3 (cut)
    with BuildSketch(Plane.XY):
        with BuildLine():
            ThreePointArc((-1.85, -2.8526303651), (3.4, 0), (-1.85, 2.8526303651))
            Line((-1.85, 2.8526303651), (-1.85, -2.8526303651))
        make_face()
    with SkipClean():  # cleaning this boolean's faces spoils the solid; the shape is the same uncleaned
        extrude(amount=F3_DEPTH, mode=Mode.SUBTRACT)

    # F4 (on face) → F5 (join)
    with BuildSketch(Plane.XY.offset(17)):
        Polygon((-1.5, -1.2123696111), (-1.5, -7.2123696111), (0, -9), (1.5, -7.2123696111), (1.5, -1.2123696111), align=None)
    extrude(amount=F5_DEPTH)

    add(f1.part.fix(), mode=Mode.REPLACE)


solid = f1.part
